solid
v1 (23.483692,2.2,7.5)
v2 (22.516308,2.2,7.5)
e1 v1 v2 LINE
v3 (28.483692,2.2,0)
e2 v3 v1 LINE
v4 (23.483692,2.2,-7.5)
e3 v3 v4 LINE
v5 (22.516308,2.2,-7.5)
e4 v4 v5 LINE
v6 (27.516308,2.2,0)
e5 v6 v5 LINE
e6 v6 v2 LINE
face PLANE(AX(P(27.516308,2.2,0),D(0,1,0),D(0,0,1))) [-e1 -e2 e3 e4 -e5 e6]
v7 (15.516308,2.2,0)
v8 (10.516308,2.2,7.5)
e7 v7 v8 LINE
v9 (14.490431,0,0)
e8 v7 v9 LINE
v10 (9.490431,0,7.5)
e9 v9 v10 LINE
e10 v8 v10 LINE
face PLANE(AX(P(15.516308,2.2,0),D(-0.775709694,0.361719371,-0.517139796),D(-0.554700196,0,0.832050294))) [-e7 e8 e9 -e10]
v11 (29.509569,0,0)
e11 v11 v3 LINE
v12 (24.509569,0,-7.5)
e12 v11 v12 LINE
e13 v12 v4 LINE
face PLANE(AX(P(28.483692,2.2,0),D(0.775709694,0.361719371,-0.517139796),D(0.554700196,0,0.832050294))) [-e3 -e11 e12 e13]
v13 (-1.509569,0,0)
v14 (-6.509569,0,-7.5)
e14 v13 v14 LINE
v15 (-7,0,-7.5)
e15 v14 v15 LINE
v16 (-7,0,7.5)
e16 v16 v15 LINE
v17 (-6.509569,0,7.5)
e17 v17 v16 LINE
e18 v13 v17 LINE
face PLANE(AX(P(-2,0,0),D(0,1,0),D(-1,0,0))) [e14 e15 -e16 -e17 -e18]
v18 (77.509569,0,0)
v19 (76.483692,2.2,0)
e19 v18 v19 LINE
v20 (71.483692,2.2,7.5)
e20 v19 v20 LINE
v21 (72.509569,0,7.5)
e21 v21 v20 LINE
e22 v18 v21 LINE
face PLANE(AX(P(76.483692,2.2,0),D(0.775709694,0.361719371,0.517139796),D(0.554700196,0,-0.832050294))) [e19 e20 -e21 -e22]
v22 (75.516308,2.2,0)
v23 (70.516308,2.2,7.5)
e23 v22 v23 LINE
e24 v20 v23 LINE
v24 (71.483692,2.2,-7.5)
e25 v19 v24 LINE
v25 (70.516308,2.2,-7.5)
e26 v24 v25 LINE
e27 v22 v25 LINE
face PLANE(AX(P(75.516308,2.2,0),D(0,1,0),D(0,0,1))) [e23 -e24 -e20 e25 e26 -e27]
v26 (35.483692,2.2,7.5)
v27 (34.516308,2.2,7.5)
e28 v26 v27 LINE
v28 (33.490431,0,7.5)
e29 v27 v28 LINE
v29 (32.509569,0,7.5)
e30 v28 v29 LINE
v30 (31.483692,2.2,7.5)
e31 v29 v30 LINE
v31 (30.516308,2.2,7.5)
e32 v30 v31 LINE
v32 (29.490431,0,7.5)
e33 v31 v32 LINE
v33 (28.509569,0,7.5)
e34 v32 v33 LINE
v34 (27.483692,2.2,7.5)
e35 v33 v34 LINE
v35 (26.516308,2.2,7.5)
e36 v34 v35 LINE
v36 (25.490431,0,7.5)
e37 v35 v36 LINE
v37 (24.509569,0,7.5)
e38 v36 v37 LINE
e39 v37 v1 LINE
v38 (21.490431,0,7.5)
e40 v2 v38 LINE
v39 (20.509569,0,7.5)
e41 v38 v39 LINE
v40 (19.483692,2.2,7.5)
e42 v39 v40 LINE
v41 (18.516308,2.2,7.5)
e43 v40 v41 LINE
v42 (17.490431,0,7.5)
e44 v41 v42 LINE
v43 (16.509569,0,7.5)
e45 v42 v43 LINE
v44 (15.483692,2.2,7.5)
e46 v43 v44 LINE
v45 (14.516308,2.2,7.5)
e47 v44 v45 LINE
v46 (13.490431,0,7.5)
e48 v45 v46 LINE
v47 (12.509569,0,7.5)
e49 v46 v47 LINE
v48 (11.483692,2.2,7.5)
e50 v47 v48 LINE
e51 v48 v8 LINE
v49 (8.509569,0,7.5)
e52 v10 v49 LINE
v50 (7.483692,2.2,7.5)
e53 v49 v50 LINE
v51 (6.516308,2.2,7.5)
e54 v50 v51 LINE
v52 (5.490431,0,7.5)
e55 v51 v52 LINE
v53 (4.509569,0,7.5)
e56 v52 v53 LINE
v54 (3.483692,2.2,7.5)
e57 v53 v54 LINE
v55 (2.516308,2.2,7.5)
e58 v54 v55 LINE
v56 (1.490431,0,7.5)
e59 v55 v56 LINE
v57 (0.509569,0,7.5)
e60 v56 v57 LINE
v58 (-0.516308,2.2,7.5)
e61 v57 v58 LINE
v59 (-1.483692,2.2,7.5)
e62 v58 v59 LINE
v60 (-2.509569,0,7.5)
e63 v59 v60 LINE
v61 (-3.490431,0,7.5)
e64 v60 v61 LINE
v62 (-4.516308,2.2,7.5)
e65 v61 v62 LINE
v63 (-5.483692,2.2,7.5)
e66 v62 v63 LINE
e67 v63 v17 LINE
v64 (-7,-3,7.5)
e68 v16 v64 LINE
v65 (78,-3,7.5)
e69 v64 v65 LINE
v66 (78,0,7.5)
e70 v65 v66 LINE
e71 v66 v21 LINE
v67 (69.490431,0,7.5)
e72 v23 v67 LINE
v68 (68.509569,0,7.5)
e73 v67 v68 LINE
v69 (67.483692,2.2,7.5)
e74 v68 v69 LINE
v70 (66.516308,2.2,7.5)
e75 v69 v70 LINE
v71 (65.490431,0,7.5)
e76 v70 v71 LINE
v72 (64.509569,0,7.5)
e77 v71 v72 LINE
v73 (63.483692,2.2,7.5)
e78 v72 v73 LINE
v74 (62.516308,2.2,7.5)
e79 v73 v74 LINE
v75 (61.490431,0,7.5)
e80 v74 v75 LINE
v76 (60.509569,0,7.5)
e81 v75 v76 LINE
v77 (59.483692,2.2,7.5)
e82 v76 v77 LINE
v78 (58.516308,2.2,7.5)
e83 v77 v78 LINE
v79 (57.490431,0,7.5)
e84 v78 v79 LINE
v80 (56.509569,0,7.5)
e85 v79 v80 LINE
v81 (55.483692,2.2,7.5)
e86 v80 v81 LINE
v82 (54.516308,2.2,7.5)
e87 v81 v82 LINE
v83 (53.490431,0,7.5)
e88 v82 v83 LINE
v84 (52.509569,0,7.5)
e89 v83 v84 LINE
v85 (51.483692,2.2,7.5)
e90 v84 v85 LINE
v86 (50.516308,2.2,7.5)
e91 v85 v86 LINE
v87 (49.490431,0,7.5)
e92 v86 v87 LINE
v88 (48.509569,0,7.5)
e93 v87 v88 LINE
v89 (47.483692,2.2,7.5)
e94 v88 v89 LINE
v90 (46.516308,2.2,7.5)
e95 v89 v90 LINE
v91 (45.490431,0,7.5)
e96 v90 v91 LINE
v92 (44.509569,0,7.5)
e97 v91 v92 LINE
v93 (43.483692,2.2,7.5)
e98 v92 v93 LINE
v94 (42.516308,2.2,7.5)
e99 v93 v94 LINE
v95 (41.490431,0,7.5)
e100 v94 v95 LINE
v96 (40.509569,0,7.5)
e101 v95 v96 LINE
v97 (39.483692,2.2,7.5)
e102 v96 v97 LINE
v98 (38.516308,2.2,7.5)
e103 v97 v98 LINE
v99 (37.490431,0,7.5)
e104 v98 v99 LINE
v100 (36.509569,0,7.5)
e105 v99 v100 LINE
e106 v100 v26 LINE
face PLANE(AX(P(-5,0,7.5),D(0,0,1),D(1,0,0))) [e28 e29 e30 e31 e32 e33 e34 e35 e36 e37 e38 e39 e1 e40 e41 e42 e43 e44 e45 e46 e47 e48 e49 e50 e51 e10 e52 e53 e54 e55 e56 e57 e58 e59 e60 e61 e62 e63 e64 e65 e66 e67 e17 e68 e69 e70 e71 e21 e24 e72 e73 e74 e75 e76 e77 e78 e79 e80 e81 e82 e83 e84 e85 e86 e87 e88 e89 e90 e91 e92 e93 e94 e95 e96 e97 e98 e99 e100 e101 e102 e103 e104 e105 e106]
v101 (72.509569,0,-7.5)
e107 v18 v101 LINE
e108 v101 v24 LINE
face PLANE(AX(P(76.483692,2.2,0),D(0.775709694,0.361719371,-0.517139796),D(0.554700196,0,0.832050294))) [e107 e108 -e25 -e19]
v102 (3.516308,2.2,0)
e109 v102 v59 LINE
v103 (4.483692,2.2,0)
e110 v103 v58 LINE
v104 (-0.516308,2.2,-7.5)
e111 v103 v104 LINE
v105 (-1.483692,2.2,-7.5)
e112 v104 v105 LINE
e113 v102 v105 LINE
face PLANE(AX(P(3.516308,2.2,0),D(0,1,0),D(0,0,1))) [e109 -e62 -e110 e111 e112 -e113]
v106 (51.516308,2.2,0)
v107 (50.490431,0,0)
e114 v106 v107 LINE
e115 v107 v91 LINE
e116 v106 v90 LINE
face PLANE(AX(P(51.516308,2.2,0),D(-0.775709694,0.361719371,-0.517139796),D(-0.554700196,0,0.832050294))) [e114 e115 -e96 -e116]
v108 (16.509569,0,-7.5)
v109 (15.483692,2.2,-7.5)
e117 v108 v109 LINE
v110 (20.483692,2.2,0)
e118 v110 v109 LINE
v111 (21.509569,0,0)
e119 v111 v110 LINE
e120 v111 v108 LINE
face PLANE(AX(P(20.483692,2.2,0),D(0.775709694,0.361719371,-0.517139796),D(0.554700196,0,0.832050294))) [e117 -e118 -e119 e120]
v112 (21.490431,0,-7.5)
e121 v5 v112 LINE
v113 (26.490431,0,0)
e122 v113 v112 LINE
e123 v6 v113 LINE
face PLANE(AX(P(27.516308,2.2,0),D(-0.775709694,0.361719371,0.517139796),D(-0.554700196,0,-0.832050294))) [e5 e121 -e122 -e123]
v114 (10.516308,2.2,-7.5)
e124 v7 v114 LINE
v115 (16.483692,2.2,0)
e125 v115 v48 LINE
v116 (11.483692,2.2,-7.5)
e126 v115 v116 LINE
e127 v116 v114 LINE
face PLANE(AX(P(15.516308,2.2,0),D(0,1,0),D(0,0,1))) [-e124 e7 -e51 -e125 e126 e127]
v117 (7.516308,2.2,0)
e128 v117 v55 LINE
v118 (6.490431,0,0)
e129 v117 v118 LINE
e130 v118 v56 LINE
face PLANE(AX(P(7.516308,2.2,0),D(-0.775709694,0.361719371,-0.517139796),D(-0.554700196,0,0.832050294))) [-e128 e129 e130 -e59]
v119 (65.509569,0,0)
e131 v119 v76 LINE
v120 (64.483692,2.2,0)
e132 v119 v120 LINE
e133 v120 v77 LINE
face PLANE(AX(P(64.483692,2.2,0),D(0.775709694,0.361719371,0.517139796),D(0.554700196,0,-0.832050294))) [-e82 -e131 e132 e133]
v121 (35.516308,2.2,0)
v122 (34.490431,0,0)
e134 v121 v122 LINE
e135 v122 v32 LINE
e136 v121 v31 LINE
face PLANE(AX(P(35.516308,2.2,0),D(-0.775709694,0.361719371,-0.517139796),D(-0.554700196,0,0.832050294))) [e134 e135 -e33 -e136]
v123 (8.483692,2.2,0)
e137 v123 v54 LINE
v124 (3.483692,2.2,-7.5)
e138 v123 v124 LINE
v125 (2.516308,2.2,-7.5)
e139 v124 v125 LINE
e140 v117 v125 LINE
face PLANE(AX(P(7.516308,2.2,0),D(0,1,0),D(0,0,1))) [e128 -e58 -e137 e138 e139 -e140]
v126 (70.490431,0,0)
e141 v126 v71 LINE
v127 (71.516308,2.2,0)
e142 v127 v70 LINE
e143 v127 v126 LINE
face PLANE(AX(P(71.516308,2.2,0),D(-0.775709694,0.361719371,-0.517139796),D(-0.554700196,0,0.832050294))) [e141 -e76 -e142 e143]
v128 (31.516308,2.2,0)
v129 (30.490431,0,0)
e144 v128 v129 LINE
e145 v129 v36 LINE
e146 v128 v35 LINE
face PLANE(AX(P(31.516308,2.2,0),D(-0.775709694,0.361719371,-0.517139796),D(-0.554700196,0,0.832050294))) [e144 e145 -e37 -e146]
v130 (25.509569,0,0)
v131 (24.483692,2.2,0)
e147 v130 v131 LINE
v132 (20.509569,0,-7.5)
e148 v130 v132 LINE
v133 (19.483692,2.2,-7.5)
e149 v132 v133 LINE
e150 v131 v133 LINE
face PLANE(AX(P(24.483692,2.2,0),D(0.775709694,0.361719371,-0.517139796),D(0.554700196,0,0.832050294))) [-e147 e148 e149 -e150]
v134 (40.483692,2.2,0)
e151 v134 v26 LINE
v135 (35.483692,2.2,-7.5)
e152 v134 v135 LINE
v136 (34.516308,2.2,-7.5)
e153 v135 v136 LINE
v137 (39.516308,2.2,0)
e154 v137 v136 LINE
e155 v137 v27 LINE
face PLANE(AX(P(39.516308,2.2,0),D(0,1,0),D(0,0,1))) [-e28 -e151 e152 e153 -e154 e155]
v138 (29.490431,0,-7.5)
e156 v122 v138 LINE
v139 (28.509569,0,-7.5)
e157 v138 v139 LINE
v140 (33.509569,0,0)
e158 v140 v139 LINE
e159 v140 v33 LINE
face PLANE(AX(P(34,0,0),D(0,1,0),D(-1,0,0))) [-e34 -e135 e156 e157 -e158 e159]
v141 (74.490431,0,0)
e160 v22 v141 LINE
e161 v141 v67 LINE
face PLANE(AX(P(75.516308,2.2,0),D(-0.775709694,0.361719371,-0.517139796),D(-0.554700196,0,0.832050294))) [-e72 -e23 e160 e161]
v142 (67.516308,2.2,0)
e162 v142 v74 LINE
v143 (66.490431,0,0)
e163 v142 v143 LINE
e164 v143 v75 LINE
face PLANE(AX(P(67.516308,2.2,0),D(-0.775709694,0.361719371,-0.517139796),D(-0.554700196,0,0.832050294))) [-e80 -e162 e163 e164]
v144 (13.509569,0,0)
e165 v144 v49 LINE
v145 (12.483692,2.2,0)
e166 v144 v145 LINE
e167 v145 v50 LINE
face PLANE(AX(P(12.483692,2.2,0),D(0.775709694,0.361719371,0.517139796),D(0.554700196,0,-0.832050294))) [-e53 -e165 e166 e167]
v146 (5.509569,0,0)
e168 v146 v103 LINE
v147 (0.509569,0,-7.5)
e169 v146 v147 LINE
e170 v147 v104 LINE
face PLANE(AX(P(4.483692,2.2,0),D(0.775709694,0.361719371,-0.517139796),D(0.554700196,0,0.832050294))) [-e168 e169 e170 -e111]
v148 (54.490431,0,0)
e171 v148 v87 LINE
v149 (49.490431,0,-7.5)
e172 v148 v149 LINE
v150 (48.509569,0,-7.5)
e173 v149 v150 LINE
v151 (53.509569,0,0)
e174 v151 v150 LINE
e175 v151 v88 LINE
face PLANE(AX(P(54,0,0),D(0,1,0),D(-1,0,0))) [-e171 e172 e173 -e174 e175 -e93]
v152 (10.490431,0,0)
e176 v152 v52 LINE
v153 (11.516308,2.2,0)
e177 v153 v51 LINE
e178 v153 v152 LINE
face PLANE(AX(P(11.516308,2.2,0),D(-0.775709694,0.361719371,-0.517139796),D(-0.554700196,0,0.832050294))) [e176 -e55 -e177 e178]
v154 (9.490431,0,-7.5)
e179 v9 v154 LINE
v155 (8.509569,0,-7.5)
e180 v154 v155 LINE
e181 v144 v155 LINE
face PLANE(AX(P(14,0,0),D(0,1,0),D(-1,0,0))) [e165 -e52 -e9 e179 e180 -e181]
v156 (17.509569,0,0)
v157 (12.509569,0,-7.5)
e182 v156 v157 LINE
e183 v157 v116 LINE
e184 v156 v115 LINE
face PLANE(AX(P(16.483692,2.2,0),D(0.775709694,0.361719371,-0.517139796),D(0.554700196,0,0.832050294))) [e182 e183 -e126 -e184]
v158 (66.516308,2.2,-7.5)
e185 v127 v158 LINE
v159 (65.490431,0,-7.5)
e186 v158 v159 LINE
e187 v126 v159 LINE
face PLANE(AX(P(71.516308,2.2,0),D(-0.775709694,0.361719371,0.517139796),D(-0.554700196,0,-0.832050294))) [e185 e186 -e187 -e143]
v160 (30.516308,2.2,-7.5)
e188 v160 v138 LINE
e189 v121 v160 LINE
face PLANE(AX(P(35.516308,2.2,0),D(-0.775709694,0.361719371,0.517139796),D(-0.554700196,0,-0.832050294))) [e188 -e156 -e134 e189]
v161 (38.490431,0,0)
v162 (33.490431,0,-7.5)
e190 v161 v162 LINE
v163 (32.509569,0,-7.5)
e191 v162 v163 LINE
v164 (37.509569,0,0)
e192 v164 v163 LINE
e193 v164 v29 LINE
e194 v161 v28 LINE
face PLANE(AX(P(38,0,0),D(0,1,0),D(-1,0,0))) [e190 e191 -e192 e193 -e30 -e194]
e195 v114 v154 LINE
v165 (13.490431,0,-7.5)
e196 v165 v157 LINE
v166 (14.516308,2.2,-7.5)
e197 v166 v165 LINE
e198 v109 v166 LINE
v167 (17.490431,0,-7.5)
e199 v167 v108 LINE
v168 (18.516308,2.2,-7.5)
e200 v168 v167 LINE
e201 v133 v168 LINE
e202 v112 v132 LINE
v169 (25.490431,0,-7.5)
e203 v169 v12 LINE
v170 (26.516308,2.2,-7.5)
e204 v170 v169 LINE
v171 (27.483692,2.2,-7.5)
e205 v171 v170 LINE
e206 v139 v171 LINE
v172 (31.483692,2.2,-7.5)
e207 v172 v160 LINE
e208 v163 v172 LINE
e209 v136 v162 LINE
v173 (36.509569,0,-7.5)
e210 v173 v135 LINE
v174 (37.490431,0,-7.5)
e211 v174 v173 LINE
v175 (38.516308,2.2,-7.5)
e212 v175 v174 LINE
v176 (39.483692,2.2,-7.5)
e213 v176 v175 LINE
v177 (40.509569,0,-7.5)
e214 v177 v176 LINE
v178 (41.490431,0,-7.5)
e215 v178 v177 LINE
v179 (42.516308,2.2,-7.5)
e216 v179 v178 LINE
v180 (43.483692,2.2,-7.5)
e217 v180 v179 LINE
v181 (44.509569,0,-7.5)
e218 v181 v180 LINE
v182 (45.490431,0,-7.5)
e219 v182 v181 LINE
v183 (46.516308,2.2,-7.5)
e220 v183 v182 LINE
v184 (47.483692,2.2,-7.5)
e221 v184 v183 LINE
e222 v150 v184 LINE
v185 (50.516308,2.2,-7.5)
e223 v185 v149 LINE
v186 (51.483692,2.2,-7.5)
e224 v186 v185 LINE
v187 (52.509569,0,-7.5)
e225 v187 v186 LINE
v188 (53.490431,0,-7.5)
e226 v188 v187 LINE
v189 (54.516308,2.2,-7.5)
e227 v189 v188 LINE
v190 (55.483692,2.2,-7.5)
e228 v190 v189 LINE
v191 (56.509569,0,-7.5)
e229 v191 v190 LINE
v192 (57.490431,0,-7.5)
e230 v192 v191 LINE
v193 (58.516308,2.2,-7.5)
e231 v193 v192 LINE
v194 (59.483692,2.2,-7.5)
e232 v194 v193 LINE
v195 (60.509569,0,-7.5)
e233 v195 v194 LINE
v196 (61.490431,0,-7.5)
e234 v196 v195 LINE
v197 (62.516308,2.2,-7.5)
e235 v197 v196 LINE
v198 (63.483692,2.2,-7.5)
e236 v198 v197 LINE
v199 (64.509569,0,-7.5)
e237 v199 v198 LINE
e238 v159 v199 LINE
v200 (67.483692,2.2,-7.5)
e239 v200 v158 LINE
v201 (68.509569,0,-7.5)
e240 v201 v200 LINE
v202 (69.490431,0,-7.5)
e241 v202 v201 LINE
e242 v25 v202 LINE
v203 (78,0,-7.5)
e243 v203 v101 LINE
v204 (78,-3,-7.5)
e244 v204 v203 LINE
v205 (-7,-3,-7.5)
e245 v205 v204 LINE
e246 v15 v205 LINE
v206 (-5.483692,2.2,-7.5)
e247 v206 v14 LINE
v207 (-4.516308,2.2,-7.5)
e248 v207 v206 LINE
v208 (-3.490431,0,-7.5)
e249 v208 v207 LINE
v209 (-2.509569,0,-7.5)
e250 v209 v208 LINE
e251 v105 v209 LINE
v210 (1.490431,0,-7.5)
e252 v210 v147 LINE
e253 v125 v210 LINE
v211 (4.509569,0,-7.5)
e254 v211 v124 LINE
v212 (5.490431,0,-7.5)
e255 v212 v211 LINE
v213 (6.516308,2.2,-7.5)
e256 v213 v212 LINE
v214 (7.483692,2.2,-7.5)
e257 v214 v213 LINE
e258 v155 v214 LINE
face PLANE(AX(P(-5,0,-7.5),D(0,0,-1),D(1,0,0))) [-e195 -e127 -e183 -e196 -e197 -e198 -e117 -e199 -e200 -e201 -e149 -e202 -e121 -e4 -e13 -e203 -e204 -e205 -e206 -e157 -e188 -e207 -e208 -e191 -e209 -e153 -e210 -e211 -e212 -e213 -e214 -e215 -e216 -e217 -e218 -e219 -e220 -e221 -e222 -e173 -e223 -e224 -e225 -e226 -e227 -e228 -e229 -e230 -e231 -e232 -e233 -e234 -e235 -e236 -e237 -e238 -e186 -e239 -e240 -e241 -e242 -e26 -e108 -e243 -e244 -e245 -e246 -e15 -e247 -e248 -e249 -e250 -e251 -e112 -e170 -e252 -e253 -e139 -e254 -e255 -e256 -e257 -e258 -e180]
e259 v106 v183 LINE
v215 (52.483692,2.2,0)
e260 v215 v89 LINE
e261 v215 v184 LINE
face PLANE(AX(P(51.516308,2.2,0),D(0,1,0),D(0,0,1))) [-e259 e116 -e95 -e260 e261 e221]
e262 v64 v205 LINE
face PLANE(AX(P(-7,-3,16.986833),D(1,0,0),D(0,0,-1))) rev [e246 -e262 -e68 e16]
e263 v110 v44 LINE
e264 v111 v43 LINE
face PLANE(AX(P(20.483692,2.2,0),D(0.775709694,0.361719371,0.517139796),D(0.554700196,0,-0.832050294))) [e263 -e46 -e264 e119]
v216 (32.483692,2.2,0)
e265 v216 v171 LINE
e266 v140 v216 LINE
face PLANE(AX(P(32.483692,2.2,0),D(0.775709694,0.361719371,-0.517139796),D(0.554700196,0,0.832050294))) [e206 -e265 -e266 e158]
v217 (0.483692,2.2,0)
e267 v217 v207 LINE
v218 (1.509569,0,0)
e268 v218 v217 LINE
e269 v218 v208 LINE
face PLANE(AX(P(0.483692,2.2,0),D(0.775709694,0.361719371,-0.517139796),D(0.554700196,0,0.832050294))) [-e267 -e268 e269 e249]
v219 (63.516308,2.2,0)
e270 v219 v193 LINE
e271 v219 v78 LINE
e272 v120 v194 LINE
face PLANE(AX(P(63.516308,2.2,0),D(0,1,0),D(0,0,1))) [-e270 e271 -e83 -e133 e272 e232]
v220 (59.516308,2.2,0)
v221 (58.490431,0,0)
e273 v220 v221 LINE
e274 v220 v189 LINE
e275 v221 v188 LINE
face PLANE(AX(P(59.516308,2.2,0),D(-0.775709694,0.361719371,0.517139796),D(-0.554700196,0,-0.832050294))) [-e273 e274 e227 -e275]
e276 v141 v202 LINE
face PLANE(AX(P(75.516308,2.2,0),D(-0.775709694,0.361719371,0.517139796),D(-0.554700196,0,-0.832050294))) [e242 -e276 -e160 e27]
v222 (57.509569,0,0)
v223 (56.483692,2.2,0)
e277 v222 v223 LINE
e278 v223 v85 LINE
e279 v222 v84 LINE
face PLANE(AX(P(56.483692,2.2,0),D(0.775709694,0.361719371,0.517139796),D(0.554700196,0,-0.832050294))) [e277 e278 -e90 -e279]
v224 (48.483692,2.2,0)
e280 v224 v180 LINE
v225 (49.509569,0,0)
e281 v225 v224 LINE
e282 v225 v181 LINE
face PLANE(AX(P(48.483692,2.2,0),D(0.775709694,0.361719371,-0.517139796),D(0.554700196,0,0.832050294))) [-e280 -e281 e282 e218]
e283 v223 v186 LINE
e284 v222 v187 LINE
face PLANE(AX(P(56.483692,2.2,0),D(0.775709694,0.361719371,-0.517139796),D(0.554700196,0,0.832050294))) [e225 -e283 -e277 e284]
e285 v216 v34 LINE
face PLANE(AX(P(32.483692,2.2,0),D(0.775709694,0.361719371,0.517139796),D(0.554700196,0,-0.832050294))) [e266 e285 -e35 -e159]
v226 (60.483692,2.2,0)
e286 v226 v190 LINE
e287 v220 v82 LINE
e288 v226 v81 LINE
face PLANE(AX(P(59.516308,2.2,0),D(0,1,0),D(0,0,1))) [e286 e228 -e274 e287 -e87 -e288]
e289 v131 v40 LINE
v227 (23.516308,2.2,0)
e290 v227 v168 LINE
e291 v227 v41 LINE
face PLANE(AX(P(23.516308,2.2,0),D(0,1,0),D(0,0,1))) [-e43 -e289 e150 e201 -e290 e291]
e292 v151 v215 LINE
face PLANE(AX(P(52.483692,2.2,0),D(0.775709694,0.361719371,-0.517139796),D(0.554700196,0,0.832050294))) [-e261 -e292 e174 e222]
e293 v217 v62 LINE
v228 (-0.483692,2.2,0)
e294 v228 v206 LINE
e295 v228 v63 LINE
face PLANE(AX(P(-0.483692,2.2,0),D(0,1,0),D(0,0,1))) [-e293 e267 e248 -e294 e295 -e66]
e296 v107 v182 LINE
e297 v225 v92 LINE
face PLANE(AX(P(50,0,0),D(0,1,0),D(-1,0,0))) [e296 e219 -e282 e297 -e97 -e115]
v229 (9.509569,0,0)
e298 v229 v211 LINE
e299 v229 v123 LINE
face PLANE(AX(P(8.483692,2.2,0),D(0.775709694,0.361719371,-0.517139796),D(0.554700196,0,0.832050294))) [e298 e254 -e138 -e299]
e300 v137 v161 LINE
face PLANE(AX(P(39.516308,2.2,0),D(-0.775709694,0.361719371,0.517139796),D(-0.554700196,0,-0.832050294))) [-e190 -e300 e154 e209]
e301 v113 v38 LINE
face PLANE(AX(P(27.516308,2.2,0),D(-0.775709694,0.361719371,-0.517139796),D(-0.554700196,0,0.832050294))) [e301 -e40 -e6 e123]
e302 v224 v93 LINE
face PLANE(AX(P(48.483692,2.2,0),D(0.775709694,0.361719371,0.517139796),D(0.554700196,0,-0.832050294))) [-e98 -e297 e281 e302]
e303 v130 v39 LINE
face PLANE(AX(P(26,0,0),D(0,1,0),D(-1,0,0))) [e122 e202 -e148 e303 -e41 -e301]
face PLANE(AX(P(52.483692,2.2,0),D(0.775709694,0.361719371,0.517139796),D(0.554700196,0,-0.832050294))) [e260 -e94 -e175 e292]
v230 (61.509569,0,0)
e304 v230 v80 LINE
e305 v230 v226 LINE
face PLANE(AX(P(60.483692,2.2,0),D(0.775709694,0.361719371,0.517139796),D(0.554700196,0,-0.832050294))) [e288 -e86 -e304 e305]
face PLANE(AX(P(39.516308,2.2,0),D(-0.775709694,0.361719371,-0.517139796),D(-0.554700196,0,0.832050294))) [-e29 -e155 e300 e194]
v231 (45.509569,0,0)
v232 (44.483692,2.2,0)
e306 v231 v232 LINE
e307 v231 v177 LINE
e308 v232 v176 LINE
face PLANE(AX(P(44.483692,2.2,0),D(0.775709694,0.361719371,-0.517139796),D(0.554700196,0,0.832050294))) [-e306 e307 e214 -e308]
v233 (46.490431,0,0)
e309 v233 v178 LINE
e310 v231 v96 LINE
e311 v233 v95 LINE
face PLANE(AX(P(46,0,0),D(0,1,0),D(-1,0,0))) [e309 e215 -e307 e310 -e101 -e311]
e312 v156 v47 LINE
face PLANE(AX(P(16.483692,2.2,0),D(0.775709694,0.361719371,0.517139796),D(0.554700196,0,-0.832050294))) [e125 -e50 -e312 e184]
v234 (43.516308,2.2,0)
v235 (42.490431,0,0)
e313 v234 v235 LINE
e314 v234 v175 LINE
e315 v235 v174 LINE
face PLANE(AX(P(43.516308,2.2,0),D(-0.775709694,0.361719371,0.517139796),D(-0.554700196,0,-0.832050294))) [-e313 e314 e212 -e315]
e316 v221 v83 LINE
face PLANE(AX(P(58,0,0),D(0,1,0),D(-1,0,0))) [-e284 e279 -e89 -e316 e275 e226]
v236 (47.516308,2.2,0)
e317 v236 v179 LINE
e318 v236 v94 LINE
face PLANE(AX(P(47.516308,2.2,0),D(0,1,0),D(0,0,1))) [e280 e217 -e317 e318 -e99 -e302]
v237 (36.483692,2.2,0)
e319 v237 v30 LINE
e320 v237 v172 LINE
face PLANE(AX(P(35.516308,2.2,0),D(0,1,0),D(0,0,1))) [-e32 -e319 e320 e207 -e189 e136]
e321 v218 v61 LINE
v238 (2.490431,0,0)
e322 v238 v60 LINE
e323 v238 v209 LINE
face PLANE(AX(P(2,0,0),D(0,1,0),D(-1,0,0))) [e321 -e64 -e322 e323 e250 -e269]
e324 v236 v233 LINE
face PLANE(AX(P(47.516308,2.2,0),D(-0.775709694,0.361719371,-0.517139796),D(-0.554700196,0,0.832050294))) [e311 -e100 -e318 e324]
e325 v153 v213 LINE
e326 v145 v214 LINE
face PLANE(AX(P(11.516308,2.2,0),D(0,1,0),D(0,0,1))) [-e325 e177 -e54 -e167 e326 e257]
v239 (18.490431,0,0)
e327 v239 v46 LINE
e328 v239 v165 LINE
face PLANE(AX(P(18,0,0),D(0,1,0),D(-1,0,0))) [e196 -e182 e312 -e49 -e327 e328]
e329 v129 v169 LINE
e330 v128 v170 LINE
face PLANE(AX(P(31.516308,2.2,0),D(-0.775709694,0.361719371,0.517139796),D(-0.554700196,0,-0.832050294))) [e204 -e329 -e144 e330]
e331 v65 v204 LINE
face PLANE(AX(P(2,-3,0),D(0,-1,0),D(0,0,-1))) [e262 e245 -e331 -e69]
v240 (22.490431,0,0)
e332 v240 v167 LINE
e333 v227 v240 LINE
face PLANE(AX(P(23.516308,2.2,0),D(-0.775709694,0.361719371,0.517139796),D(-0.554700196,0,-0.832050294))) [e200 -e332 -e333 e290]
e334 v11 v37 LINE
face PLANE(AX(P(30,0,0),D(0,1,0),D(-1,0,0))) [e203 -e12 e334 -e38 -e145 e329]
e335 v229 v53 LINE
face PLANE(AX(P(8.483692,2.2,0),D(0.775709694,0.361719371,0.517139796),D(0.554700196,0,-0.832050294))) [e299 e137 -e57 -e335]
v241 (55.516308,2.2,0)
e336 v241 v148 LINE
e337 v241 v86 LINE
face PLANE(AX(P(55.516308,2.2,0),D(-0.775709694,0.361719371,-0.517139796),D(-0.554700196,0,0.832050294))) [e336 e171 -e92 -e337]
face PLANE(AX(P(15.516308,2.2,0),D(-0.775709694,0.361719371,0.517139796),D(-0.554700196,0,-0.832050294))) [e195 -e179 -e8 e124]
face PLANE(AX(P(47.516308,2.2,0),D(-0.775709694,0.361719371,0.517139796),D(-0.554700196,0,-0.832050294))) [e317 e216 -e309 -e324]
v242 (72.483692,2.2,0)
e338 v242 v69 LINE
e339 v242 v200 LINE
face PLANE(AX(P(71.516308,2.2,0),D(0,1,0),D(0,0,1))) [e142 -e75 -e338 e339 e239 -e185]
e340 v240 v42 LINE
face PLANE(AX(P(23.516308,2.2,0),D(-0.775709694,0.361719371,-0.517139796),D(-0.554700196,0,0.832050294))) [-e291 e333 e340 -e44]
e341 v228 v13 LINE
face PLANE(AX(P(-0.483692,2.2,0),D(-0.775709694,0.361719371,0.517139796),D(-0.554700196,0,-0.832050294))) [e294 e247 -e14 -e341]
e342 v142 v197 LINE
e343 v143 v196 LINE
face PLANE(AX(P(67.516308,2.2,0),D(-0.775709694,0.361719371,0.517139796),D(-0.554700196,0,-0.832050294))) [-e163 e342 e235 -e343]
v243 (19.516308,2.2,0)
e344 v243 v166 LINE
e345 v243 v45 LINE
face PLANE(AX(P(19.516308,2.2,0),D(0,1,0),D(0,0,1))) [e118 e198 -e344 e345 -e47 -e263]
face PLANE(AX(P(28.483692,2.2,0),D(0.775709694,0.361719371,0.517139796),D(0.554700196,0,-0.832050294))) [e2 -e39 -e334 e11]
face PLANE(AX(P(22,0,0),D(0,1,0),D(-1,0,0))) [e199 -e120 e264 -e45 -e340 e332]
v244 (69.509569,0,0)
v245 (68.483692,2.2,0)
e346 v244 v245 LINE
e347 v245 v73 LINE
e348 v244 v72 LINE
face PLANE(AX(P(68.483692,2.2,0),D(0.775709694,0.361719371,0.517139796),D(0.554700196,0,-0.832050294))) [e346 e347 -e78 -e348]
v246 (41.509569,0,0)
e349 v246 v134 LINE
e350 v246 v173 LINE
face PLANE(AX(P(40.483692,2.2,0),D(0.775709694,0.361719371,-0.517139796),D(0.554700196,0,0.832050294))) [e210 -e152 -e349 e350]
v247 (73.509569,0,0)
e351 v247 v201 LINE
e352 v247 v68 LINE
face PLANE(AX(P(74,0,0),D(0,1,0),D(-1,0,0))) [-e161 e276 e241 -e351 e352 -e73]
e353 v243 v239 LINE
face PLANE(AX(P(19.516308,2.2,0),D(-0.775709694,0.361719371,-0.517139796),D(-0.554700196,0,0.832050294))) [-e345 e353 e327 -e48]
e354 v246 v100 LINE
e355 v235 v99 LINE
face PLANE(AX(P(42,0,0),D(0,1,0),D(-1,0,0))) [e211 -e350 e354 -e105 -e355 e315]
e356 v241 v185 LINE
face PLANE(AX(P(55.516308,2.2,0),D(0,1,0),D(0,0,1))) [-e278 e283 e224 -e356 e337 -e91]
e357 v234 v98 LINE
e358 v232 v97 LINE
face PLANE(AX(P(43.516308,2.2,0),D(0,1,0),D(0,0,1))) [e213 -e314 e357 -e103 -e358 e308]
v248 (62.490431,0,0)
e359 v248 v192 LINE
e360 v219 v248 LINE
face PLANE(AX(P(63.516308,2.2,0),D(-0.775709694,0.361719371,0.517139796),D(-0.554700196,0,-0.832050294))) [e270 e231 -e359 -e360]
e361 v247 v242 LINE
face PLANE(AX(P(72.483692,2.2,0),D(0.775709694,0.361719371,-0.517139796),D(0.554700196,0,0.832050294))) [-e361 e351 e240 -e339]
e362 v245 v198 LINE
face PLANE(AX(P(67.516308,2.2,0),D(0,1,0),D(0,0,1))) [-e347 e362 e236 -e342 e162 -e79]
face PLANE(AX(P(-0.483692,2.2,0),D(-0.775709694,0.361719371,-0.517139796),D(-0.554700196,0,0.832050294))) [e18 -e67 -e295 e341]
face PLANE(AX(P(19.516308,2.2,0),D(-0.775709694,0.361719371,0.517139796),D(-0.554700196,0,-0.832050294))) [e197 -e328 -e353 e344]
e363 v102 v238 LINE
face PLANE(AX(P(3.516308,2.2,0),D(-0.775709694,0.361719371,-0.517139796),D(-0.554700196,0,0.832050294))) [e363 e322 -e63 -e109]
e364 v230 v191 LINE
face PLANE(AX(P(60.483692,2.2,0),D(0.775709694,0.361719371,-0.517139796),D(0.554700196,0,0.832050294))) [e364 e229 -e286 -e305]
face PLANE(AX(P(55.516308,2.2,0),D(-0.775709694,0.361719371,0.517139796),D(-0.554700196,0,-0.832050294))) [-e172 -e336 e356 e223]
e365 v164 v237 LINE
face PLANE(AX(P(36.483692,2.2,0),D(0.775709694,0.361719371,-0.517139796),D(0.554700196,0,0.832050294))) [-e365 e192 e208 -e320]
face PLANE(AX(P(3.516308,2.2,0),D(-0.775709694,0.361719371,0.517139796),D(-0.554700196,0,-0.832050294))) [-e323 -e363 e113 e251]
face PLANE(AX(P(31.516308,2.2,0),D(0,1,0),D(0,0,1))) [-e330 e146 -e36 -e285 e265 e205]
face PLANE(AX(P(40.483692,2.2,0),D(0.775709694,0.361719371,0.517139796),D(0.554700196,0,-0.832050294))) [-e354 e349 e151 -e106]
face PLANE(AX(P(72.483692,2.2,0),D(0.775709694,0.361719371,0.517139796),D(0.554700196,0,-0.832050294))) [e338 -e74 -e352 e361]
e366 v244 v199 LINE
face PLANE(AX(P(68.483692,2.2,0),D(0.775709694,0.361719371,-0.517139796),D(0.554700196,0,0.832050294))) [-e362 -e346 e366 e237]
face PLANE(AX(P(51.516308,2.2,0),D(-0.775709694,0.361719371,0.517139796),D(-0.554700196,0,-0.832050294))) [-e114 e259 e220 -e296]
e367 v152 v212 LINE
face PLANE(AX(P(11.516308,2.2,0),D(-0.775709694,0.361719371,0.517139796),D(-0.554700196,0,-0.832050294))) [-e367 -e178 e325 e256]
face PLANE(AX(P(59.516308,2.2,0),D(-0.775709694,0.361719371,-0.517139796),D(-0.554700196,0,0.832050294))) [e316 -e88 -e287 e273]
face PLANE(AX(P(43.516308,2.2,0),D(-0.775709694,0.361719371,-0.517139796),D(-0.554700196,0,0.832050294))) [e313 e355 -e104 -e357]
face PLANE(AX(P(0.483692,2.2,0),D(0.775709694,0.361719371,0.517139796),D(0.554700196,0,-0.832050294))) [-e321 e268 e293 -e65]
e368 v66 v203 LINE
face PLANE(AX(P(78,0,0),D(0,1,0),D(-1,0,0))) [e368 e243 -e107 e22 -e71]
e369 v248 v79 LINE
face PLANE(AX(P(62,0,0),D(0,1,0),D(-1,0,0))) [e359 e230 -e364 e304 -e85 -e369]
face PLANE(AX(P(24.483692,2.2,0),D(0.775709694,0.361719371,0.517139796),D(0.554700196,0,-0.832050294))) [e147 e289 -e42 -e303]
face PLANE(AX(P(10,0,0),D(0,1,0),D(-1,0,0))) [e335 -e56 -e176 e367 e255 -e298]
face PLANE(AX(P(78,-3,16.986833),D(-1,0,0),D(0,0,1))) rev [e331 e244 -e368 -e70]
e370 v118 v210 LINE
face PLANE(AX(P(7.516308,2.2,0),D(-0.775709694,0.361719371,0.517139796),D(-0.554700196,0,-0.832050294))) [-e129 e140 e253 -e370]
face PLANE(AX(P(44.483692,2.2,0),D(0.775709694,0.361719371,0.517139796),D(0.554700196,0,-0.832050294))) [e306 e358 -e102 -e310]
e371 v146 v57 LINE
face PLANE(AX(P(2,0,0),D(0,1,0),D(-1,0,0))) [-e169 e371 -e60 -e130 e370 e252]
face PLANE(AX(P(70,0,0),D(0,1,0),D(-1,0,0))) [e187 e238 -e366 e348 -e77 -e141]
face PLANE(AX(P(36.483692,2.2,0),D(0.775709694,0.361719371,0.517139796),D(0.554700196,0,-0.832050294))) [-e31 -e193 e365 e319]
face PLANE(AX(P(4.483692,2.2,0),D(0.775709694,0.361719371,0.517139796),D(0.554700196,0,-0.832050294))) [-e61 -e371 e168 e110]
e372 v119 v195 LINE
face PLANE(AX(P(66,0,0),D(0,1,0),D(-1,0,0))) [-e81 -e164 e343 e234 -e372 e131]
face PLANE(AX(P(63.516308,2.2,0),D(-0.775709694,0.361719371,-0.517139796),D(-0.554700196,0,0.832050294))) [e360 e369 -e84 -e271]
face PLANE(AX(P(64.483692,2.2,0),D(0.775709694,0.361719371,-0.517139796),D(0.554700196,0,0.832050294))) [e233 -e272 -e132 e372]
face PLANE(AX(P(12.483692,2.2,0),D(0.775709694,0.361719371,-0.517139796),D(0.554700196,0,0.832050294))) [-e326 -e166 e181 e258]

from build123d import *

# Parameters (mm, degrees)
SKETCH3_W                    = 9
SKETCH3_H                    = 3
EXTRUDE_END_DEPTH            = 7.5
PATTERN_START                = -3
PATTERN_HALF_TEETH_OUTLINE_W = 76
PATTERN_HALF_TEETH_OUTLINE_H = 7.5
PATTERN_HALF_TEETH_DEPTH     = 3


with BuildPart() as part:
    # Sweep Half Tooth: sweep along a path in Sketch2
    with BuildLine(Plane(origin=(0, 0, 0), x_dir=(1, 0, 0), z_dir=(0, 1, 0))) as sweep_half_tooth_path:
        Line((0, 0), (-5, -7.5))
    # Sketch1 → Sweep Half Tooth (sweep)
    with BuildSketch(Plane.XY):
        Polygon((-0.483692342, 2.2), (0.483692342, 2.2), (1.50956919, 0), (2, 0), (2, -3), (-2, -3), (-2, 0), (-1.50956919, 0), align=None)
    sweep(path=sweep_half_tooth_path.line)

    # Sketch3 → Extrude End (add)
    with BuildSketch(Plane.XY):
        with Locations((-2.5, -1.5)):
            Rectangle(SKETCH3_W, SKETCH3_H)
    extrude(amount=EXTRUDE_END_DEPTH)

    # Pattern Half Teeth: read off the stored shape, not the designer's step
    # Pattern Half Teeth outline → Pattern Half Teeth (add)
    with BuildSketch(Plane(origin=(0, 0, 0), x_dir=(1, 0, 0), z_dir=(0, 1, 0)).offset(PATTERN_START)):
        with Locations((40, -3.75)):
            Rectangle(PATTERN_HALF_TEETH_OUTLINE_W, PATTERN_HALF_TEETH_OUTLINE_H)
    extrude(amount=PATTERN_HALF_TEETH_DEPTH)

    # Pattern Half Teeth 2: loft between two sections, ruled curve by curve
    pattern_half_teeth_2_from = [
        Edge.make_line((0.50956919, 0, 7.5), (5.50956919, 0, 0)),
        Edge.make_line((2.49043081, 0, 0), (-2.50956919, 0, 7.5)),
        Edge.make_line((2.49043081, 0, 0), (5.50956919, 0, 0)),
        Edge.make_line((-2.50956919, 0, 7.5), (0.50956919, 0, 7.5)),
    ]
    pattern_half_teeth_2_to = [
        Edge.make_line((-0.516307658, 2.2, 7.5), (4.483692342, 2.2, 0)),
        Edge.make_line((3.516307658, 2.2, 0), (-1.483692342, 2.2, 7.5)),
        Edge.make_line((3.516307658, 2.2, 0), (4.483692342, 2.2, 0)),
        Edge.make_line((-1.483692342, 2.2, 7.5), (-0.516307658, 2.2, 7.5)),
    ]
    pattern_half_teeth_2 = Solid(Shell([*[Face.make_surface_from_curves(pattern_half_teeth_2_from[k], pattern_half_teeth_2_to[k]) for k in range(4)], Face(Wire(pattern_half_teeth_2_from)), Face(Wire(pattern_half_teeth_2_to))]))
    add(pattern_half_teeth_2)

    # Pattern Half Teeth 3: loft between two sections, ruled curve by curve
    pattern_half_teeth_3_from = [
        Edge.make_line((4.50956919, 0, 7.5), (9.50956919, 0, 0)),
        Edge.make_line((6.49043081, 0, 0), (1.49043081, 0, 7.5)),
        Edge.make_line((1.49043081, 0, 7.5), (4.50956919, 0, 7.5)),
        Edge.make_line((6.49043081, 0, 0), (9.50956919, 0, 0)),
    ]
    pattern_half_teeth_3_to = [
        Edge.make_line((3.483692342, 2.2, 7.5), (8.483692342, 2.2, 0)),
        Edge.make_line((7.516307658, 2.2, 0), (2.516307658, 2.2, 7.5)),
        Edge.make_line((2.516307658, 2.2, 7.5), (3.483692342, 2.2, 7.5)),
        Edge.make_line((7.516307658, 2.2, 0), (8.483692342, 2.2, 0)),
    ]
    pattern_half_teeth_3 = Solid(Shell([*[Face.make_surface_from_curves(pattern_half_teeth_3_from[k], pattern_half_teeth_3_to[k]) for k in range(4)], Face(Wire(pattern_half_teeth_3_from)), Face(Wire(pattern_half_teeth_3_to))]))
    add(pattern_half_teeth_3)

    # Pattern Half Teeth 4: loft between two sections, ruled curve by curve
    pattern_half_teeth_4_from = [
        Edge.make_line((8.50956919, 0, 7.5), (13.50956919, 0, 0)),
        Edge.make_line((10.49043081, 0, 0), (5.49043081, 0, 7.5)),
        Edge.make_line((5.49043081, 0, 7.5), (8.50956919, 0, 7.5)),
        Edge.make_line((10.49043081, 0, 0), (13.50956919, 0, 0)),
    ]
    pattern_half_teeth_4_to = [
        Edge.make_line((7.483692342, 2.2, 7.5), (12.483692342, 2.2, 0)),
        Edge.make_line((11.516307658, 2.2, 0), (6.516307658, 2.2, 7.5)),
        Edge.make_line((6.516307658, 2.2, 7.5), (7.483692342, 2.2, 7.5)),
        Edge.make_line((11.516307658, 2.2, 0), (12.483692342, 2.2, 0)),
    ]
    pattern_half_teeth_4 = Solid(Shell([*[Face.make_surface_from_curves(pattern_half_teeth_4_from[k], pattern_half_teeth_4_to[k]) for k in range(4)], Face(Wire(pattern_half_teeth_4_from)), Face(Wire(pattern_half_teeth_4_to))]))
    add(pattern_half_teeth_4)

    # Pattern Half Teeth 5: loft between two sections, ruled curve by curve
    pattern_half_teeth_5_from = [
        Edge.make_line((12.50956919, 0, 7.5), (17.50956919, 0, 0)),
        Edge.make_line((14.49043081, 0, 0), (9.49043081, 0, 7.5)),
        Edge.make_line((14.49043081, 0, 0), (17.50956919, 0, 0)),
        Edge.make_line((9.49043081, 0, 7.5), (12.50956919, 0, 7.5)),
    ]
    pattern_half_teeth_5_to = [
        Edge.make_line((11.483692342, 2.2, 7.5), (16.483692342, 2.2, 0)),
        Edge.make_line((15.516307658, 2.2, 0), (10.516307658, 2.2, 7.5)),
        Edge.make_line((15.516307658, 2.2, 0), (16.483692342, 2.2, 0)),
        Edge.make_line((10.516307658, 2.2, 7.5), (11.483692342, 2.2, 7.5)),
    ]
    pattern_half_teeth_5 = Solid(Shell([*[Face.make_surface_from_curves(pattern_half_teeth_5_from[k], pattern_half_teeth_5_to[k]) for k in range(4)], Face(Wire(pattern_half_teeth_5_from)), Face(Wire(pattern_half_teeth_5_to))]))
    add(pattern_half_teeth_5)

    # Pattern Half Teeth 6: loft between two sections, ruled curve by curve
    pattern_half_teeth_6_from = [
        Edge.make_line((16.50956919, 0, 7.5), (21.50956919, 0, 0)),
        Edge.make_line((18.49043081, 0, 0), (13.49043081, 0, 7.5)),
        Edge.make_line((18.49043081, 0, 0), (21.50956919, 0, 0)),
        Edge.make_line((13.49043081, 0, 7.5), (16.50956919, 0, 7.5)),
    ]
    pattern_half_teeth_6_to = [
        Edge.make_line((15.483692342, 2.2, 7.5), (20.483692342, 2.2, 0)),
        Edge.make_line((19.516307658, 2.2, 0), (14.516307658, 2.2, 7.5)),
        Edge.make_line((19.516307658, 2.2, 0), (20.483692342, 2.2, 0)),
        Edge.make_line((14.516307658, 2.2, 7.5), (15.483692342, 2.2, 7.5)),
    ]
    pattern_half_teeth_6 = Solid(Shell([*[Face.make_surface_from_curves(pattern_half_teeth_6_from[k], pattern_half_teeth_6_to[k]) for k in range(4)], Face(Wire(pattern_half_teeth_6_from)), Face(Wire(pattern_half_teeth_6_to))]))
    add(pattern_half_teeth_6)

    # Pattern Half Teeth 7: loft between two sections, ruled curve by curve
    pattern_half_teeth_7_from = [
        Edge.make_line((20.50956919, 0, 7.5), (25.50956919, 0, 0)),
        Edge.make_line((22.49043081, 0, 0), (17.49043081, 0, 7.5)),
        Edge.make_line((22.49043081, 0, 0), (25.50956919, 0, 0)),
        Edge.make_line((17.49043081, 0, 7.5), (20.50956919, 0, 7.5)),
    ]
    pattern_half_teeth_7_to = [
        Edge.make_line((19.483692342, 2.2, 7.5), (24.483692342, 2.2, 0)),
        Edge.make_line((23.516307658, 2.2, 0), (18.516307658, 2.2, 7.5)),
        Edge.make_line((23.516307658, 2.2, 0), (24.483692342, 2.2, 0)),
        Edge.make_line((18.516307658, 2.2, 7.5), (19.483692342, 2.2, 7.5)),
    ]
    pattern_half_teeth_7 = Solid(Shell([*[Face.make_surface_from_curves(pattern_half_teeth_7_from[k], pattern_half_teeth_7_to[k]) for k in range(4)], Face(Wire(pattern_half_teeth_7_from)), Face(Wire(pattern_half_teeth_7_to))]))
    add(pattern_half_teeth_7)

    # Pattern Half Teeth 8: loft between two sections, ruled curve by curve
    pattern_half_teeth_8_from = [
        Edge.make_line((24.50956919, 0, 7.5), (29.50956919, 0, 0)),
        Edge.make_line((26.49043081, 0, 0), (21.49043081, 0, 7.5)),
        Edge.make_line((26.49043081, 0, 0), (29.50956919, 0, 0)),
        Edge.make_line((21.49043081, 0, 7.5), (24.50956919, 0, 7.5)),
    ]
    pattern_half_teeth_8_to = [
        Edge.make_line((23.483692342, 2.2, 7.5), (28.483692342, 2.2, 0)),
        Edge.make_line((27.516307658, 2.2, 0), (22.516307658, 2.2, 7.5)),
        Edge.make_line((27.516307658, 2.2, 0), (28.483692342, 2.2, 0)),
        Edge.make_line((22.516307658, 2.2, 7.5), (23.483692342, 2.2, 7.5)),
    ]
    pattern_half_teeth_8 = Solid(Shell([*[Face.make_surface_from_curves(pattern_half_teeth_8_from[k], pattern_half_teeth_8_to[k]) for k in range(4)], Face(Wire(pattern_half_teeth_8_from)), Face(Wire(pattern_half_teeth_8_to))]))
    add(pattern_half_teeth_8)

    # Pattern Half Teeth 9: loft between two sections, ruled curve by curve
    pattern_half_teeth_9_from = [
        Edge.make_line((28.50956919, 0, 7.5), (33.50956919, 0, 0)),
        Edge.make_line((30.49043081, 0, 0), (25.49043081, 0, 7.5)),
        Edge.make_line((30.49043081, 0, 0), (33.50956919, 0, 0)),
        Edge.make_line((25.49043081, 0, 7.5), (28.50956919, 0, 7.5)),
    ]
    pattern_half_teeth_9_to = [
        Edge.make_line((27.483692342, 2.2, 7.5), (32.483692342, 2.2, 0)),
        Edge.make_line((31.516307658, 2.2, 0), (26.516307658, 2.2, 7.5)),
        Edge.make_line((31.516307658, 2.2, 0), (32.483692342, 2.2, 0)),
        Edge.make_line((26.516307658, 2.2, 7.5), (27.483692342, 2.2, 7.5)),
    ]
    pattern_half_teeth_9 = Solid(Shell([*[Face.make_surface_from_curves(pattern_half_teeth_9_from[k], pattern_half_teeth_9_to[k]) for k in range(4)], Face(Wire(pattern_half_teeth_9_from)), Face(Wire(pattern_half_teeth_9_to))]))
    add(pattern_half_teeth_9)

    # Pattern Half Teeth 10: loft between two sections, ruled curve by curve
    pattern_half_teeth_10_from = [
        Edge.make_line((32.50956919, 0, 7.5), (37.50956919, 0, 0)),
        Edge.make_line((34.49043081, 0, 0), (29.49043081, 0, 7.5)),
        Edge.make_line((34.49043081, 0, 0), (37.50956919, 0, 0)),
        Edge.make_line((29.49043081, 0, 7.5), (32.50956919, 0, 7.5)),
    ]
    pattern_half_teeth_10_to = [
        Edge.make_line((31.483692342, 2.2, 7.5), (36.483692342, 2.2, 0)),
        Edge.make_line((35.516307658, 2.2, 0), (30.516307658, 2.2, 7.5)),
        Edge.make_line((35.516307658, 2.2, 0), (36.483692342, 2.2, 0)),
        Edge.make_line((30.516307658, 2.2, 7.5), (31.483692342, 2.2, 7.5)),
    ]
    pattern_half_teeth_10 = Solid(Shell([*[Face.make_surface_from_curves(pattern_half_teeth_10_from[k], pattern_half_teeth_10_to[k]) for k in range(4)], Face(Wire(pattern_half_teeth_10_from)), Face(Wire(pattern_half_teeth_10_to))]))
    add(pattern_half_teeth_10)

    # Pattern Half Teeth 11: loft between two sections, ruled curve by curve
    pattern_half_teeth_11_from = [
        Edge.make_line((36.50956919, 0, 7.5), (41.50956919, 0, 0)),
        Edge.make_line((38.49043081, 0, 0), (33.49043081, 0, 7.5)),
        Edge.make_line((38.49043081, 0, 0), (41.50956919, 0, 0)),
        Edge.make_line((33.49043081, 0, 7.5), (36.50956919, 0, 7.5)),
    ]
    pattern_half_teeth_11_to = [
        Edge.make_line((35.483692342, 2.2, 7.5), (40.483692342, 2.2, 0)),
        Edge.make_line((39.516307658, 2.2, 0), (34.516307658, 2.2, 7.5)),
        Edge.make_line((39.516307658, 2.2, 0), (40.483692342, 2.2, 0)),
        Edge.make_line((34.516307658, 2.2, 7.5), (35.483692342, 2.2, 7.5)),
    ]
    pattern_half_teeth_11 = Solid(Shell([*[Face.make_surface_from_curves(pattern_half_teeth_11_from[k], pattern_half_teeth_11_to[k]) for k in range(4)], Face(Wire(pattern_half_teeth_11_from)), Face(Wire(pattern_half_teeth_11_to))]))
    add(pattern_half_teeth_11)

    # Pattern Half Teeth 12: loft between two sections, ruled curve by curve
    pattern_half_teeth_12_from = [
        Edge.make_line((40.50956919, 0, 7.5), (45.50956919, 0, 0)),
        Edge.make_line((42.49043081, 0, 0), (37.49043081, 0, 7.5)),
        Edge.make_line((42.49043081, 0, 0), (45.50956919, 0, 0)),
        Edge.make_line((37.49043081, 0, 7.5), (40.50956919, 0, 7.5)),
    ]
    pattern_half_teeth_12_to = [
        Edge.make_line((39.483692342, 2.2, 7.5), (44.483692342, 2.2, 0)),
        Edge.make_line((43.516307658, 2.2, 0), (38.516307658, 2.2, 7.5)),
        Edge.make_line((43.516307658, 2.2, 0), (44.483692342, 2.2, 0)),
        Edge.make_line((38.516307658, 2.2, 7.5), (39.483692342, 2.2, 7.5)),
    ]
    pattern_half_teeth_12 = Solid(Shell([*[Face.make_surface_from_curves(pattern_half_teeth_12_from[k], pattern_half_teeth_12_to[k]) for k in range(4)], Face(Wire(pattern_half_teeth_12_from)), Face(Wire(pattern_half_teeth_12_to))]))
    add(pattern_half_teeth_12)

    # Pattern Half Teeth 13: loft between two sections, ruled curve by curve
    pattern_half_teeth_13_from = [
        Edge.make_line((44.50956919, 0, 7.5), (49.50956919, 0, 0)),
        Edge.make_line((46.49043081, 0, 0), (41.49043081, 0, 7.5)),
        Edge.make_line((46.49043081, 0, 0), (49.50956919, 0, 0)),
        Edge.make_line((41.49043081, 0, 7.5), (44.50956919, 0, 7.5)),
    ]
    pattern_half_teeth_13_to = [
        Edge.make_line((43.483692342, 2.2, 7.5), (48.483692342, 2.2, 0)),
        Edge.make_line((47.516307658, 2.2, 0), (42.516307658, 2.2, 7.5)),
        Edge.make_line((47.516307658, 2.2, 0), (48.483692342, 2.2, 0)),
        Edge.make_line((42.516307658, 2.2, 7.5), (43.483692342, 2.2, 7.5)),
    ]
    pattern_half_teeth_13 = Solid(Shell([*[Face.make_surface_from_curves(pattern_half_teeth_13_from[k], pattern_half_teeth_13_to[k]) for k in range(4)], Face(Wire(pattern_half_teeth_13_from)), Face(Wire(pattern_half_teeth_13_to))]))
    add(pattern_half_teeth_13)

    # Pattern Half Teeth 14: loft between two sections, ruled curve by curve
    pattern_half_teeth_14_from = [
        Edge.make_line((48.50956919, 0, 7.5), (53.50956919, 0, 0)),
        Edge.make_line((50.49043081, 0, 0), (45.49043081, 0, 7.5)),
        Edge.make_line((50.49043081, 0, 0), (53.50956919, 0, 0)),
        Edge.make_line((45.49043081, 0, 7.5), (48.50956919, 0, 7.5)),
    ]
    pattern_half_teeth_14_to = [
        Edge.make_line((47.483692342, 2.2, 7.5), (52.483692342, 2.2, 0)),
        Edge.make_line((51.516307658, 2.2, 0), (46.516307658, 2.2, 7.5)),
        Edge.make_line((51.516307658, 2.2, 0), (52.483692342, 2.2, 0)),
        Edge.make_line((46.516307658, 2.2, 7.5), (47.483692342, 2.2, 7.5)),
    ]
    pattern_half_teeth_14 = Solid(Shell([*[Face.make_surface_from_curves(pattern_half_teeth_14_from[k], pattern_half_teeth_14_to[k]) for k in range(4)], Face(Wire(pattern_half_teeth_14_from)), Face(Wire(pattern_half_teeth_14_to))]))
    add(pattern_half_teeth_14)

    # Pattern Half Teeth 15: loft between two sections, ruled curve by curve
    pattern_half_teeth_15_from = [
        Edge.make_line((52.50956919, 0, 7.5), (57.50956919, 0, 0)),
        Edge.make_line((54.49043081, 0, 0), (49.49043081, 0, 7.5)),
        Edge.make_line((54.49043081, 0, 0), (57.50956919, 0, 0)),
        Edge.make_line((49.49043081, 0, 7.5), (52.50956919, 0, 7.5)),
    ]
    pattern_half_teeth_15_to = [
        Edge.make_line((51.483692342, 2.2, 7.5), (56.483692342, 2.2, 0)),
        Edge.make_line((55.516307658, 2.2, 0), (50.516307658, 2.2, 7.5)),
        Edge.make_line((55.516307658, 2.2, 0), (56.483692342, 2.2, 0)),
        Edge.make_line((50.516307658, 2.2, 7.5), (51.483692342, 2.2, 7.5)),
    ]
    pattern_half_teeth_15 = Solid(Shell([*[Face.make_surface_from_curves(pattern_half_teeth_15_from[k], pattern_half_teeth_15_to[k]) for k in range(4)], Face(Wire(pattern_half_teeth_15_from)), Face(Wire(pattern_half_teeth_15_to))]))
    add(pattern_half_teeth_15)

    # Pattern Half Teeth 16: loft between two sections, ruled curve by curve
    pattern_half_teeth_16_from = [
        Edge.make_line((56.50956919, 0, 7.5), (61.50956919, 0, 0)),
        Edge.make_line((58.49043081, 0, 0), (53.49043081, 0, 7.5)),
        Edge.make_line((58.49043081, 0, 0), (61.50956919, 0, 0)),
        Edge.make_line((53.49043081, 0, 7.5), (56.50956919, 0, 7.5)),
    ]
    pattern_half_teeth_16_to = [
        Edge.make_line((55.483692342, 2.2, 7.5), (60.483692342, 2.2, 0)),
        Edge.make_line((59.516307658, 2.2, 0), (54.516307658, 2.2, 7.5)),
        Edge.make_line((59.516307658, 2.2, 0), (60.483692342, 2.2, 0)),
        Edge.make_line((54.516307658, 2.2, 7.5), (55.483692342, 2.2, 7.5)),
    ]
    pattern_half_teeth_16 = Solid(Shell([*[Face.make_surface_from_curves(pattern_half_teeth_16_from[k], pattern_half_teeth_16_to[k]) for k in range(4)], Face(Wire(pattern_half_teeth_16_from)), Face(Wire(pattern_half_teeth_16_to))]))
    add(pattern_half_teeth_16)

    # Pattern Half Teeth 17: loft between two sections, ruled curve by curve
    pattern_half_teeth_17_from = [
        Edge.make_line((60.50956919, 0, 7.5), (65.50956919, 0, 0)),
        Edge.make_line((62.49043081, 0, 0), (57.49043081, 0, 7.5)),
        Edge.make_line((62.49043081, 0, 0), (65.50956919, 0, 0)),
        Edge.make_line((57.49043081, 0, 7.5), (60.50956919, 0, 7.5)),
    ]
    pattern_half_teeth_17_to = [
        Edge.make_line((59.483692342, 2.2, 7.5), (64.483692342, 2.2, 0)),
        Edge.make_line((63.516307658, 2.2, 0), (58.516307658, 2.2, 7.5)),
        Edge.make_line((63.516307658, 2.2, 0), (64.483692342, 2.2, 0)),
        Edge.make_line((58.516307658, 2.2, 7.5), (59.483692342, 2.2, 7.5)),
    ]
    pattern_half_teeth_17 = Solid(Shell([*[Face.make_surface_from_curves(pattern_half_teeth_17_from[k], pattern_half_teeth_17_to[k]) for k in range(4)], Face(Wire(pattern_half_teeth_17_from)), Face(Wire(pattern_half_teeth_17_to))]))
    add(pattern_half_teeth_17)

    # Pattern Half Teeth 18: loft between two sections, ruled curve by curve
    pattern_half_teeth_18_from = [
        Edge.make_line((64.50956919, 0, 7.5), (69.50956919, 0, 0)),
        Edge.make_line((66.49043081, 0, 0), (61.49043081, 0, 7.5)),
        Edge.make_line((66.49043081, 0, 0), (69.50956919, 0, 0)),
        Edge.make_line((61.49043081, 0, 7.5), (64.50956919, 0, 7.5)),
    ]
    pattern_half_teeth_18_to = [
        Edge.make_line((63.483692342, 2.2, 7.5), (68.483692342, 2.2, 0)),
        Edge.make_line((67.516307658, 2.2, 0), (62.516307658, 2.2, 7.5)),
        Edge.make_line((67.516307658, 2.2, 0), (68.483692342, 2.2, 0)),
        Edge.make_line((62.516307658, 2.2, 7.5), (63.483692342, 2.2, 7.5)),
    ]
    pattern_half_teeth_18 = Solid(Shell([*[Face.make_surface_from_curves(pattern_half_teeth_18_from[k], pattern_half_teeth_18_to[k]) for k in range(4)], Face(Wire(pattern_half_teeth_18_from)), Face(Wire(pattern_half_teeth_18_to))]))
    add(pattern_half_teeth_18)

    # Pattern Half Teeth 19: loft between two sections, ruled curve by curve
    pattern_half_teeth_19_from = [
        Edge.make_line((68.50956919, 0, 7.5), (73.50956919, 0, 0)),
        Edge.make_line((70.49043081, 0, 0), (65.49043081, 0, 7.5)),
        Edge.make_line((70.49043081, 0, 0), (73.50956919, 0, 0)),
        Edge.make_line((65.49043081, 0, 7.5), (68.50956919, 0, 7.5)),
    ]
    pattern_half_teeth_19_to = [
        Edge.make_line((67.483692342, 2.2, 7.5), (72.483692342, 2.2, 0)),
        Edge.make_line((71.516307658, 2.2, 0), (66.516307658, 2.2, 7.5)),
        Edge.make_line((71.516307658, 2.2, 0), (72.483692342, 2.2, 0)),
        Edge.make_line((66.516307658, 2.2, 7.5), (67.483692342, 2.2, 7.5)),
    ]
    pattern_half_teeth_19 = Solid(Shell([*[Face.make_surface_from_curves(pattern_half_teeth_19_from[k], pattern_half_teeth_19_to[k]) for k in range(4)], Face(Wire(pattern_half_teeth_19_from)), Face(Wire(pattern_half_teeth_19_to))]))
    add(pattern_half_teeth_19)

    # Pattern Half Teeth 20: loft between two sections, ruled curve by curve
    pattern_half_teeth_20_from = [
        Edge.make_line((72.50956919, 0, 7.5), (77.50956919, 0, 0)),
        Edge.make_line((74.49043081, 0, 0), (69.49043081, 0, 7.5)),
        Edge.make_line((74.49043081, 0, 0), (77.50956919, 0, 0)),
        Edge.make_line((69.49043081, 0, 7.5), (72.50956919, 0, 7.5)),
    ]
    pattern_half_teeth_20_to = [
        Edge.make_line((71.483692342, 2.2, 7.5), (76.483692342, 2.2, 0)),
        Edge.make_line((75.516307658, 2.2, 0), (70.516307658, 2.2, 7.5)),
        Edge.make_line((75.516307658, 2.2, 0), (76.483692342, 2.2, 0)),
        Edge.make_line((70.516307658, 2.2, 7.5), (71.483692342, 2.2, 7.5)),
    ]
    pattern_half_teeth_20 = Solid(Shell([*[Face.make_surface_from_curves(pattern_half_teeth_20_from[k], pattern_half_teeth_20_to[k]) for k in range(4)], Face(Wire(pattern_half_teeth_20_from)), Face(Wire(pattern_half_teeth_20_to))]))
    add(pattern_half_teeth_20)

    # Mirror Teeth: part across plane


with BuildPart() as part_1:
    add(part.part)
    add(part.part.mirror(Plane.XY))


solid = part_1.part
